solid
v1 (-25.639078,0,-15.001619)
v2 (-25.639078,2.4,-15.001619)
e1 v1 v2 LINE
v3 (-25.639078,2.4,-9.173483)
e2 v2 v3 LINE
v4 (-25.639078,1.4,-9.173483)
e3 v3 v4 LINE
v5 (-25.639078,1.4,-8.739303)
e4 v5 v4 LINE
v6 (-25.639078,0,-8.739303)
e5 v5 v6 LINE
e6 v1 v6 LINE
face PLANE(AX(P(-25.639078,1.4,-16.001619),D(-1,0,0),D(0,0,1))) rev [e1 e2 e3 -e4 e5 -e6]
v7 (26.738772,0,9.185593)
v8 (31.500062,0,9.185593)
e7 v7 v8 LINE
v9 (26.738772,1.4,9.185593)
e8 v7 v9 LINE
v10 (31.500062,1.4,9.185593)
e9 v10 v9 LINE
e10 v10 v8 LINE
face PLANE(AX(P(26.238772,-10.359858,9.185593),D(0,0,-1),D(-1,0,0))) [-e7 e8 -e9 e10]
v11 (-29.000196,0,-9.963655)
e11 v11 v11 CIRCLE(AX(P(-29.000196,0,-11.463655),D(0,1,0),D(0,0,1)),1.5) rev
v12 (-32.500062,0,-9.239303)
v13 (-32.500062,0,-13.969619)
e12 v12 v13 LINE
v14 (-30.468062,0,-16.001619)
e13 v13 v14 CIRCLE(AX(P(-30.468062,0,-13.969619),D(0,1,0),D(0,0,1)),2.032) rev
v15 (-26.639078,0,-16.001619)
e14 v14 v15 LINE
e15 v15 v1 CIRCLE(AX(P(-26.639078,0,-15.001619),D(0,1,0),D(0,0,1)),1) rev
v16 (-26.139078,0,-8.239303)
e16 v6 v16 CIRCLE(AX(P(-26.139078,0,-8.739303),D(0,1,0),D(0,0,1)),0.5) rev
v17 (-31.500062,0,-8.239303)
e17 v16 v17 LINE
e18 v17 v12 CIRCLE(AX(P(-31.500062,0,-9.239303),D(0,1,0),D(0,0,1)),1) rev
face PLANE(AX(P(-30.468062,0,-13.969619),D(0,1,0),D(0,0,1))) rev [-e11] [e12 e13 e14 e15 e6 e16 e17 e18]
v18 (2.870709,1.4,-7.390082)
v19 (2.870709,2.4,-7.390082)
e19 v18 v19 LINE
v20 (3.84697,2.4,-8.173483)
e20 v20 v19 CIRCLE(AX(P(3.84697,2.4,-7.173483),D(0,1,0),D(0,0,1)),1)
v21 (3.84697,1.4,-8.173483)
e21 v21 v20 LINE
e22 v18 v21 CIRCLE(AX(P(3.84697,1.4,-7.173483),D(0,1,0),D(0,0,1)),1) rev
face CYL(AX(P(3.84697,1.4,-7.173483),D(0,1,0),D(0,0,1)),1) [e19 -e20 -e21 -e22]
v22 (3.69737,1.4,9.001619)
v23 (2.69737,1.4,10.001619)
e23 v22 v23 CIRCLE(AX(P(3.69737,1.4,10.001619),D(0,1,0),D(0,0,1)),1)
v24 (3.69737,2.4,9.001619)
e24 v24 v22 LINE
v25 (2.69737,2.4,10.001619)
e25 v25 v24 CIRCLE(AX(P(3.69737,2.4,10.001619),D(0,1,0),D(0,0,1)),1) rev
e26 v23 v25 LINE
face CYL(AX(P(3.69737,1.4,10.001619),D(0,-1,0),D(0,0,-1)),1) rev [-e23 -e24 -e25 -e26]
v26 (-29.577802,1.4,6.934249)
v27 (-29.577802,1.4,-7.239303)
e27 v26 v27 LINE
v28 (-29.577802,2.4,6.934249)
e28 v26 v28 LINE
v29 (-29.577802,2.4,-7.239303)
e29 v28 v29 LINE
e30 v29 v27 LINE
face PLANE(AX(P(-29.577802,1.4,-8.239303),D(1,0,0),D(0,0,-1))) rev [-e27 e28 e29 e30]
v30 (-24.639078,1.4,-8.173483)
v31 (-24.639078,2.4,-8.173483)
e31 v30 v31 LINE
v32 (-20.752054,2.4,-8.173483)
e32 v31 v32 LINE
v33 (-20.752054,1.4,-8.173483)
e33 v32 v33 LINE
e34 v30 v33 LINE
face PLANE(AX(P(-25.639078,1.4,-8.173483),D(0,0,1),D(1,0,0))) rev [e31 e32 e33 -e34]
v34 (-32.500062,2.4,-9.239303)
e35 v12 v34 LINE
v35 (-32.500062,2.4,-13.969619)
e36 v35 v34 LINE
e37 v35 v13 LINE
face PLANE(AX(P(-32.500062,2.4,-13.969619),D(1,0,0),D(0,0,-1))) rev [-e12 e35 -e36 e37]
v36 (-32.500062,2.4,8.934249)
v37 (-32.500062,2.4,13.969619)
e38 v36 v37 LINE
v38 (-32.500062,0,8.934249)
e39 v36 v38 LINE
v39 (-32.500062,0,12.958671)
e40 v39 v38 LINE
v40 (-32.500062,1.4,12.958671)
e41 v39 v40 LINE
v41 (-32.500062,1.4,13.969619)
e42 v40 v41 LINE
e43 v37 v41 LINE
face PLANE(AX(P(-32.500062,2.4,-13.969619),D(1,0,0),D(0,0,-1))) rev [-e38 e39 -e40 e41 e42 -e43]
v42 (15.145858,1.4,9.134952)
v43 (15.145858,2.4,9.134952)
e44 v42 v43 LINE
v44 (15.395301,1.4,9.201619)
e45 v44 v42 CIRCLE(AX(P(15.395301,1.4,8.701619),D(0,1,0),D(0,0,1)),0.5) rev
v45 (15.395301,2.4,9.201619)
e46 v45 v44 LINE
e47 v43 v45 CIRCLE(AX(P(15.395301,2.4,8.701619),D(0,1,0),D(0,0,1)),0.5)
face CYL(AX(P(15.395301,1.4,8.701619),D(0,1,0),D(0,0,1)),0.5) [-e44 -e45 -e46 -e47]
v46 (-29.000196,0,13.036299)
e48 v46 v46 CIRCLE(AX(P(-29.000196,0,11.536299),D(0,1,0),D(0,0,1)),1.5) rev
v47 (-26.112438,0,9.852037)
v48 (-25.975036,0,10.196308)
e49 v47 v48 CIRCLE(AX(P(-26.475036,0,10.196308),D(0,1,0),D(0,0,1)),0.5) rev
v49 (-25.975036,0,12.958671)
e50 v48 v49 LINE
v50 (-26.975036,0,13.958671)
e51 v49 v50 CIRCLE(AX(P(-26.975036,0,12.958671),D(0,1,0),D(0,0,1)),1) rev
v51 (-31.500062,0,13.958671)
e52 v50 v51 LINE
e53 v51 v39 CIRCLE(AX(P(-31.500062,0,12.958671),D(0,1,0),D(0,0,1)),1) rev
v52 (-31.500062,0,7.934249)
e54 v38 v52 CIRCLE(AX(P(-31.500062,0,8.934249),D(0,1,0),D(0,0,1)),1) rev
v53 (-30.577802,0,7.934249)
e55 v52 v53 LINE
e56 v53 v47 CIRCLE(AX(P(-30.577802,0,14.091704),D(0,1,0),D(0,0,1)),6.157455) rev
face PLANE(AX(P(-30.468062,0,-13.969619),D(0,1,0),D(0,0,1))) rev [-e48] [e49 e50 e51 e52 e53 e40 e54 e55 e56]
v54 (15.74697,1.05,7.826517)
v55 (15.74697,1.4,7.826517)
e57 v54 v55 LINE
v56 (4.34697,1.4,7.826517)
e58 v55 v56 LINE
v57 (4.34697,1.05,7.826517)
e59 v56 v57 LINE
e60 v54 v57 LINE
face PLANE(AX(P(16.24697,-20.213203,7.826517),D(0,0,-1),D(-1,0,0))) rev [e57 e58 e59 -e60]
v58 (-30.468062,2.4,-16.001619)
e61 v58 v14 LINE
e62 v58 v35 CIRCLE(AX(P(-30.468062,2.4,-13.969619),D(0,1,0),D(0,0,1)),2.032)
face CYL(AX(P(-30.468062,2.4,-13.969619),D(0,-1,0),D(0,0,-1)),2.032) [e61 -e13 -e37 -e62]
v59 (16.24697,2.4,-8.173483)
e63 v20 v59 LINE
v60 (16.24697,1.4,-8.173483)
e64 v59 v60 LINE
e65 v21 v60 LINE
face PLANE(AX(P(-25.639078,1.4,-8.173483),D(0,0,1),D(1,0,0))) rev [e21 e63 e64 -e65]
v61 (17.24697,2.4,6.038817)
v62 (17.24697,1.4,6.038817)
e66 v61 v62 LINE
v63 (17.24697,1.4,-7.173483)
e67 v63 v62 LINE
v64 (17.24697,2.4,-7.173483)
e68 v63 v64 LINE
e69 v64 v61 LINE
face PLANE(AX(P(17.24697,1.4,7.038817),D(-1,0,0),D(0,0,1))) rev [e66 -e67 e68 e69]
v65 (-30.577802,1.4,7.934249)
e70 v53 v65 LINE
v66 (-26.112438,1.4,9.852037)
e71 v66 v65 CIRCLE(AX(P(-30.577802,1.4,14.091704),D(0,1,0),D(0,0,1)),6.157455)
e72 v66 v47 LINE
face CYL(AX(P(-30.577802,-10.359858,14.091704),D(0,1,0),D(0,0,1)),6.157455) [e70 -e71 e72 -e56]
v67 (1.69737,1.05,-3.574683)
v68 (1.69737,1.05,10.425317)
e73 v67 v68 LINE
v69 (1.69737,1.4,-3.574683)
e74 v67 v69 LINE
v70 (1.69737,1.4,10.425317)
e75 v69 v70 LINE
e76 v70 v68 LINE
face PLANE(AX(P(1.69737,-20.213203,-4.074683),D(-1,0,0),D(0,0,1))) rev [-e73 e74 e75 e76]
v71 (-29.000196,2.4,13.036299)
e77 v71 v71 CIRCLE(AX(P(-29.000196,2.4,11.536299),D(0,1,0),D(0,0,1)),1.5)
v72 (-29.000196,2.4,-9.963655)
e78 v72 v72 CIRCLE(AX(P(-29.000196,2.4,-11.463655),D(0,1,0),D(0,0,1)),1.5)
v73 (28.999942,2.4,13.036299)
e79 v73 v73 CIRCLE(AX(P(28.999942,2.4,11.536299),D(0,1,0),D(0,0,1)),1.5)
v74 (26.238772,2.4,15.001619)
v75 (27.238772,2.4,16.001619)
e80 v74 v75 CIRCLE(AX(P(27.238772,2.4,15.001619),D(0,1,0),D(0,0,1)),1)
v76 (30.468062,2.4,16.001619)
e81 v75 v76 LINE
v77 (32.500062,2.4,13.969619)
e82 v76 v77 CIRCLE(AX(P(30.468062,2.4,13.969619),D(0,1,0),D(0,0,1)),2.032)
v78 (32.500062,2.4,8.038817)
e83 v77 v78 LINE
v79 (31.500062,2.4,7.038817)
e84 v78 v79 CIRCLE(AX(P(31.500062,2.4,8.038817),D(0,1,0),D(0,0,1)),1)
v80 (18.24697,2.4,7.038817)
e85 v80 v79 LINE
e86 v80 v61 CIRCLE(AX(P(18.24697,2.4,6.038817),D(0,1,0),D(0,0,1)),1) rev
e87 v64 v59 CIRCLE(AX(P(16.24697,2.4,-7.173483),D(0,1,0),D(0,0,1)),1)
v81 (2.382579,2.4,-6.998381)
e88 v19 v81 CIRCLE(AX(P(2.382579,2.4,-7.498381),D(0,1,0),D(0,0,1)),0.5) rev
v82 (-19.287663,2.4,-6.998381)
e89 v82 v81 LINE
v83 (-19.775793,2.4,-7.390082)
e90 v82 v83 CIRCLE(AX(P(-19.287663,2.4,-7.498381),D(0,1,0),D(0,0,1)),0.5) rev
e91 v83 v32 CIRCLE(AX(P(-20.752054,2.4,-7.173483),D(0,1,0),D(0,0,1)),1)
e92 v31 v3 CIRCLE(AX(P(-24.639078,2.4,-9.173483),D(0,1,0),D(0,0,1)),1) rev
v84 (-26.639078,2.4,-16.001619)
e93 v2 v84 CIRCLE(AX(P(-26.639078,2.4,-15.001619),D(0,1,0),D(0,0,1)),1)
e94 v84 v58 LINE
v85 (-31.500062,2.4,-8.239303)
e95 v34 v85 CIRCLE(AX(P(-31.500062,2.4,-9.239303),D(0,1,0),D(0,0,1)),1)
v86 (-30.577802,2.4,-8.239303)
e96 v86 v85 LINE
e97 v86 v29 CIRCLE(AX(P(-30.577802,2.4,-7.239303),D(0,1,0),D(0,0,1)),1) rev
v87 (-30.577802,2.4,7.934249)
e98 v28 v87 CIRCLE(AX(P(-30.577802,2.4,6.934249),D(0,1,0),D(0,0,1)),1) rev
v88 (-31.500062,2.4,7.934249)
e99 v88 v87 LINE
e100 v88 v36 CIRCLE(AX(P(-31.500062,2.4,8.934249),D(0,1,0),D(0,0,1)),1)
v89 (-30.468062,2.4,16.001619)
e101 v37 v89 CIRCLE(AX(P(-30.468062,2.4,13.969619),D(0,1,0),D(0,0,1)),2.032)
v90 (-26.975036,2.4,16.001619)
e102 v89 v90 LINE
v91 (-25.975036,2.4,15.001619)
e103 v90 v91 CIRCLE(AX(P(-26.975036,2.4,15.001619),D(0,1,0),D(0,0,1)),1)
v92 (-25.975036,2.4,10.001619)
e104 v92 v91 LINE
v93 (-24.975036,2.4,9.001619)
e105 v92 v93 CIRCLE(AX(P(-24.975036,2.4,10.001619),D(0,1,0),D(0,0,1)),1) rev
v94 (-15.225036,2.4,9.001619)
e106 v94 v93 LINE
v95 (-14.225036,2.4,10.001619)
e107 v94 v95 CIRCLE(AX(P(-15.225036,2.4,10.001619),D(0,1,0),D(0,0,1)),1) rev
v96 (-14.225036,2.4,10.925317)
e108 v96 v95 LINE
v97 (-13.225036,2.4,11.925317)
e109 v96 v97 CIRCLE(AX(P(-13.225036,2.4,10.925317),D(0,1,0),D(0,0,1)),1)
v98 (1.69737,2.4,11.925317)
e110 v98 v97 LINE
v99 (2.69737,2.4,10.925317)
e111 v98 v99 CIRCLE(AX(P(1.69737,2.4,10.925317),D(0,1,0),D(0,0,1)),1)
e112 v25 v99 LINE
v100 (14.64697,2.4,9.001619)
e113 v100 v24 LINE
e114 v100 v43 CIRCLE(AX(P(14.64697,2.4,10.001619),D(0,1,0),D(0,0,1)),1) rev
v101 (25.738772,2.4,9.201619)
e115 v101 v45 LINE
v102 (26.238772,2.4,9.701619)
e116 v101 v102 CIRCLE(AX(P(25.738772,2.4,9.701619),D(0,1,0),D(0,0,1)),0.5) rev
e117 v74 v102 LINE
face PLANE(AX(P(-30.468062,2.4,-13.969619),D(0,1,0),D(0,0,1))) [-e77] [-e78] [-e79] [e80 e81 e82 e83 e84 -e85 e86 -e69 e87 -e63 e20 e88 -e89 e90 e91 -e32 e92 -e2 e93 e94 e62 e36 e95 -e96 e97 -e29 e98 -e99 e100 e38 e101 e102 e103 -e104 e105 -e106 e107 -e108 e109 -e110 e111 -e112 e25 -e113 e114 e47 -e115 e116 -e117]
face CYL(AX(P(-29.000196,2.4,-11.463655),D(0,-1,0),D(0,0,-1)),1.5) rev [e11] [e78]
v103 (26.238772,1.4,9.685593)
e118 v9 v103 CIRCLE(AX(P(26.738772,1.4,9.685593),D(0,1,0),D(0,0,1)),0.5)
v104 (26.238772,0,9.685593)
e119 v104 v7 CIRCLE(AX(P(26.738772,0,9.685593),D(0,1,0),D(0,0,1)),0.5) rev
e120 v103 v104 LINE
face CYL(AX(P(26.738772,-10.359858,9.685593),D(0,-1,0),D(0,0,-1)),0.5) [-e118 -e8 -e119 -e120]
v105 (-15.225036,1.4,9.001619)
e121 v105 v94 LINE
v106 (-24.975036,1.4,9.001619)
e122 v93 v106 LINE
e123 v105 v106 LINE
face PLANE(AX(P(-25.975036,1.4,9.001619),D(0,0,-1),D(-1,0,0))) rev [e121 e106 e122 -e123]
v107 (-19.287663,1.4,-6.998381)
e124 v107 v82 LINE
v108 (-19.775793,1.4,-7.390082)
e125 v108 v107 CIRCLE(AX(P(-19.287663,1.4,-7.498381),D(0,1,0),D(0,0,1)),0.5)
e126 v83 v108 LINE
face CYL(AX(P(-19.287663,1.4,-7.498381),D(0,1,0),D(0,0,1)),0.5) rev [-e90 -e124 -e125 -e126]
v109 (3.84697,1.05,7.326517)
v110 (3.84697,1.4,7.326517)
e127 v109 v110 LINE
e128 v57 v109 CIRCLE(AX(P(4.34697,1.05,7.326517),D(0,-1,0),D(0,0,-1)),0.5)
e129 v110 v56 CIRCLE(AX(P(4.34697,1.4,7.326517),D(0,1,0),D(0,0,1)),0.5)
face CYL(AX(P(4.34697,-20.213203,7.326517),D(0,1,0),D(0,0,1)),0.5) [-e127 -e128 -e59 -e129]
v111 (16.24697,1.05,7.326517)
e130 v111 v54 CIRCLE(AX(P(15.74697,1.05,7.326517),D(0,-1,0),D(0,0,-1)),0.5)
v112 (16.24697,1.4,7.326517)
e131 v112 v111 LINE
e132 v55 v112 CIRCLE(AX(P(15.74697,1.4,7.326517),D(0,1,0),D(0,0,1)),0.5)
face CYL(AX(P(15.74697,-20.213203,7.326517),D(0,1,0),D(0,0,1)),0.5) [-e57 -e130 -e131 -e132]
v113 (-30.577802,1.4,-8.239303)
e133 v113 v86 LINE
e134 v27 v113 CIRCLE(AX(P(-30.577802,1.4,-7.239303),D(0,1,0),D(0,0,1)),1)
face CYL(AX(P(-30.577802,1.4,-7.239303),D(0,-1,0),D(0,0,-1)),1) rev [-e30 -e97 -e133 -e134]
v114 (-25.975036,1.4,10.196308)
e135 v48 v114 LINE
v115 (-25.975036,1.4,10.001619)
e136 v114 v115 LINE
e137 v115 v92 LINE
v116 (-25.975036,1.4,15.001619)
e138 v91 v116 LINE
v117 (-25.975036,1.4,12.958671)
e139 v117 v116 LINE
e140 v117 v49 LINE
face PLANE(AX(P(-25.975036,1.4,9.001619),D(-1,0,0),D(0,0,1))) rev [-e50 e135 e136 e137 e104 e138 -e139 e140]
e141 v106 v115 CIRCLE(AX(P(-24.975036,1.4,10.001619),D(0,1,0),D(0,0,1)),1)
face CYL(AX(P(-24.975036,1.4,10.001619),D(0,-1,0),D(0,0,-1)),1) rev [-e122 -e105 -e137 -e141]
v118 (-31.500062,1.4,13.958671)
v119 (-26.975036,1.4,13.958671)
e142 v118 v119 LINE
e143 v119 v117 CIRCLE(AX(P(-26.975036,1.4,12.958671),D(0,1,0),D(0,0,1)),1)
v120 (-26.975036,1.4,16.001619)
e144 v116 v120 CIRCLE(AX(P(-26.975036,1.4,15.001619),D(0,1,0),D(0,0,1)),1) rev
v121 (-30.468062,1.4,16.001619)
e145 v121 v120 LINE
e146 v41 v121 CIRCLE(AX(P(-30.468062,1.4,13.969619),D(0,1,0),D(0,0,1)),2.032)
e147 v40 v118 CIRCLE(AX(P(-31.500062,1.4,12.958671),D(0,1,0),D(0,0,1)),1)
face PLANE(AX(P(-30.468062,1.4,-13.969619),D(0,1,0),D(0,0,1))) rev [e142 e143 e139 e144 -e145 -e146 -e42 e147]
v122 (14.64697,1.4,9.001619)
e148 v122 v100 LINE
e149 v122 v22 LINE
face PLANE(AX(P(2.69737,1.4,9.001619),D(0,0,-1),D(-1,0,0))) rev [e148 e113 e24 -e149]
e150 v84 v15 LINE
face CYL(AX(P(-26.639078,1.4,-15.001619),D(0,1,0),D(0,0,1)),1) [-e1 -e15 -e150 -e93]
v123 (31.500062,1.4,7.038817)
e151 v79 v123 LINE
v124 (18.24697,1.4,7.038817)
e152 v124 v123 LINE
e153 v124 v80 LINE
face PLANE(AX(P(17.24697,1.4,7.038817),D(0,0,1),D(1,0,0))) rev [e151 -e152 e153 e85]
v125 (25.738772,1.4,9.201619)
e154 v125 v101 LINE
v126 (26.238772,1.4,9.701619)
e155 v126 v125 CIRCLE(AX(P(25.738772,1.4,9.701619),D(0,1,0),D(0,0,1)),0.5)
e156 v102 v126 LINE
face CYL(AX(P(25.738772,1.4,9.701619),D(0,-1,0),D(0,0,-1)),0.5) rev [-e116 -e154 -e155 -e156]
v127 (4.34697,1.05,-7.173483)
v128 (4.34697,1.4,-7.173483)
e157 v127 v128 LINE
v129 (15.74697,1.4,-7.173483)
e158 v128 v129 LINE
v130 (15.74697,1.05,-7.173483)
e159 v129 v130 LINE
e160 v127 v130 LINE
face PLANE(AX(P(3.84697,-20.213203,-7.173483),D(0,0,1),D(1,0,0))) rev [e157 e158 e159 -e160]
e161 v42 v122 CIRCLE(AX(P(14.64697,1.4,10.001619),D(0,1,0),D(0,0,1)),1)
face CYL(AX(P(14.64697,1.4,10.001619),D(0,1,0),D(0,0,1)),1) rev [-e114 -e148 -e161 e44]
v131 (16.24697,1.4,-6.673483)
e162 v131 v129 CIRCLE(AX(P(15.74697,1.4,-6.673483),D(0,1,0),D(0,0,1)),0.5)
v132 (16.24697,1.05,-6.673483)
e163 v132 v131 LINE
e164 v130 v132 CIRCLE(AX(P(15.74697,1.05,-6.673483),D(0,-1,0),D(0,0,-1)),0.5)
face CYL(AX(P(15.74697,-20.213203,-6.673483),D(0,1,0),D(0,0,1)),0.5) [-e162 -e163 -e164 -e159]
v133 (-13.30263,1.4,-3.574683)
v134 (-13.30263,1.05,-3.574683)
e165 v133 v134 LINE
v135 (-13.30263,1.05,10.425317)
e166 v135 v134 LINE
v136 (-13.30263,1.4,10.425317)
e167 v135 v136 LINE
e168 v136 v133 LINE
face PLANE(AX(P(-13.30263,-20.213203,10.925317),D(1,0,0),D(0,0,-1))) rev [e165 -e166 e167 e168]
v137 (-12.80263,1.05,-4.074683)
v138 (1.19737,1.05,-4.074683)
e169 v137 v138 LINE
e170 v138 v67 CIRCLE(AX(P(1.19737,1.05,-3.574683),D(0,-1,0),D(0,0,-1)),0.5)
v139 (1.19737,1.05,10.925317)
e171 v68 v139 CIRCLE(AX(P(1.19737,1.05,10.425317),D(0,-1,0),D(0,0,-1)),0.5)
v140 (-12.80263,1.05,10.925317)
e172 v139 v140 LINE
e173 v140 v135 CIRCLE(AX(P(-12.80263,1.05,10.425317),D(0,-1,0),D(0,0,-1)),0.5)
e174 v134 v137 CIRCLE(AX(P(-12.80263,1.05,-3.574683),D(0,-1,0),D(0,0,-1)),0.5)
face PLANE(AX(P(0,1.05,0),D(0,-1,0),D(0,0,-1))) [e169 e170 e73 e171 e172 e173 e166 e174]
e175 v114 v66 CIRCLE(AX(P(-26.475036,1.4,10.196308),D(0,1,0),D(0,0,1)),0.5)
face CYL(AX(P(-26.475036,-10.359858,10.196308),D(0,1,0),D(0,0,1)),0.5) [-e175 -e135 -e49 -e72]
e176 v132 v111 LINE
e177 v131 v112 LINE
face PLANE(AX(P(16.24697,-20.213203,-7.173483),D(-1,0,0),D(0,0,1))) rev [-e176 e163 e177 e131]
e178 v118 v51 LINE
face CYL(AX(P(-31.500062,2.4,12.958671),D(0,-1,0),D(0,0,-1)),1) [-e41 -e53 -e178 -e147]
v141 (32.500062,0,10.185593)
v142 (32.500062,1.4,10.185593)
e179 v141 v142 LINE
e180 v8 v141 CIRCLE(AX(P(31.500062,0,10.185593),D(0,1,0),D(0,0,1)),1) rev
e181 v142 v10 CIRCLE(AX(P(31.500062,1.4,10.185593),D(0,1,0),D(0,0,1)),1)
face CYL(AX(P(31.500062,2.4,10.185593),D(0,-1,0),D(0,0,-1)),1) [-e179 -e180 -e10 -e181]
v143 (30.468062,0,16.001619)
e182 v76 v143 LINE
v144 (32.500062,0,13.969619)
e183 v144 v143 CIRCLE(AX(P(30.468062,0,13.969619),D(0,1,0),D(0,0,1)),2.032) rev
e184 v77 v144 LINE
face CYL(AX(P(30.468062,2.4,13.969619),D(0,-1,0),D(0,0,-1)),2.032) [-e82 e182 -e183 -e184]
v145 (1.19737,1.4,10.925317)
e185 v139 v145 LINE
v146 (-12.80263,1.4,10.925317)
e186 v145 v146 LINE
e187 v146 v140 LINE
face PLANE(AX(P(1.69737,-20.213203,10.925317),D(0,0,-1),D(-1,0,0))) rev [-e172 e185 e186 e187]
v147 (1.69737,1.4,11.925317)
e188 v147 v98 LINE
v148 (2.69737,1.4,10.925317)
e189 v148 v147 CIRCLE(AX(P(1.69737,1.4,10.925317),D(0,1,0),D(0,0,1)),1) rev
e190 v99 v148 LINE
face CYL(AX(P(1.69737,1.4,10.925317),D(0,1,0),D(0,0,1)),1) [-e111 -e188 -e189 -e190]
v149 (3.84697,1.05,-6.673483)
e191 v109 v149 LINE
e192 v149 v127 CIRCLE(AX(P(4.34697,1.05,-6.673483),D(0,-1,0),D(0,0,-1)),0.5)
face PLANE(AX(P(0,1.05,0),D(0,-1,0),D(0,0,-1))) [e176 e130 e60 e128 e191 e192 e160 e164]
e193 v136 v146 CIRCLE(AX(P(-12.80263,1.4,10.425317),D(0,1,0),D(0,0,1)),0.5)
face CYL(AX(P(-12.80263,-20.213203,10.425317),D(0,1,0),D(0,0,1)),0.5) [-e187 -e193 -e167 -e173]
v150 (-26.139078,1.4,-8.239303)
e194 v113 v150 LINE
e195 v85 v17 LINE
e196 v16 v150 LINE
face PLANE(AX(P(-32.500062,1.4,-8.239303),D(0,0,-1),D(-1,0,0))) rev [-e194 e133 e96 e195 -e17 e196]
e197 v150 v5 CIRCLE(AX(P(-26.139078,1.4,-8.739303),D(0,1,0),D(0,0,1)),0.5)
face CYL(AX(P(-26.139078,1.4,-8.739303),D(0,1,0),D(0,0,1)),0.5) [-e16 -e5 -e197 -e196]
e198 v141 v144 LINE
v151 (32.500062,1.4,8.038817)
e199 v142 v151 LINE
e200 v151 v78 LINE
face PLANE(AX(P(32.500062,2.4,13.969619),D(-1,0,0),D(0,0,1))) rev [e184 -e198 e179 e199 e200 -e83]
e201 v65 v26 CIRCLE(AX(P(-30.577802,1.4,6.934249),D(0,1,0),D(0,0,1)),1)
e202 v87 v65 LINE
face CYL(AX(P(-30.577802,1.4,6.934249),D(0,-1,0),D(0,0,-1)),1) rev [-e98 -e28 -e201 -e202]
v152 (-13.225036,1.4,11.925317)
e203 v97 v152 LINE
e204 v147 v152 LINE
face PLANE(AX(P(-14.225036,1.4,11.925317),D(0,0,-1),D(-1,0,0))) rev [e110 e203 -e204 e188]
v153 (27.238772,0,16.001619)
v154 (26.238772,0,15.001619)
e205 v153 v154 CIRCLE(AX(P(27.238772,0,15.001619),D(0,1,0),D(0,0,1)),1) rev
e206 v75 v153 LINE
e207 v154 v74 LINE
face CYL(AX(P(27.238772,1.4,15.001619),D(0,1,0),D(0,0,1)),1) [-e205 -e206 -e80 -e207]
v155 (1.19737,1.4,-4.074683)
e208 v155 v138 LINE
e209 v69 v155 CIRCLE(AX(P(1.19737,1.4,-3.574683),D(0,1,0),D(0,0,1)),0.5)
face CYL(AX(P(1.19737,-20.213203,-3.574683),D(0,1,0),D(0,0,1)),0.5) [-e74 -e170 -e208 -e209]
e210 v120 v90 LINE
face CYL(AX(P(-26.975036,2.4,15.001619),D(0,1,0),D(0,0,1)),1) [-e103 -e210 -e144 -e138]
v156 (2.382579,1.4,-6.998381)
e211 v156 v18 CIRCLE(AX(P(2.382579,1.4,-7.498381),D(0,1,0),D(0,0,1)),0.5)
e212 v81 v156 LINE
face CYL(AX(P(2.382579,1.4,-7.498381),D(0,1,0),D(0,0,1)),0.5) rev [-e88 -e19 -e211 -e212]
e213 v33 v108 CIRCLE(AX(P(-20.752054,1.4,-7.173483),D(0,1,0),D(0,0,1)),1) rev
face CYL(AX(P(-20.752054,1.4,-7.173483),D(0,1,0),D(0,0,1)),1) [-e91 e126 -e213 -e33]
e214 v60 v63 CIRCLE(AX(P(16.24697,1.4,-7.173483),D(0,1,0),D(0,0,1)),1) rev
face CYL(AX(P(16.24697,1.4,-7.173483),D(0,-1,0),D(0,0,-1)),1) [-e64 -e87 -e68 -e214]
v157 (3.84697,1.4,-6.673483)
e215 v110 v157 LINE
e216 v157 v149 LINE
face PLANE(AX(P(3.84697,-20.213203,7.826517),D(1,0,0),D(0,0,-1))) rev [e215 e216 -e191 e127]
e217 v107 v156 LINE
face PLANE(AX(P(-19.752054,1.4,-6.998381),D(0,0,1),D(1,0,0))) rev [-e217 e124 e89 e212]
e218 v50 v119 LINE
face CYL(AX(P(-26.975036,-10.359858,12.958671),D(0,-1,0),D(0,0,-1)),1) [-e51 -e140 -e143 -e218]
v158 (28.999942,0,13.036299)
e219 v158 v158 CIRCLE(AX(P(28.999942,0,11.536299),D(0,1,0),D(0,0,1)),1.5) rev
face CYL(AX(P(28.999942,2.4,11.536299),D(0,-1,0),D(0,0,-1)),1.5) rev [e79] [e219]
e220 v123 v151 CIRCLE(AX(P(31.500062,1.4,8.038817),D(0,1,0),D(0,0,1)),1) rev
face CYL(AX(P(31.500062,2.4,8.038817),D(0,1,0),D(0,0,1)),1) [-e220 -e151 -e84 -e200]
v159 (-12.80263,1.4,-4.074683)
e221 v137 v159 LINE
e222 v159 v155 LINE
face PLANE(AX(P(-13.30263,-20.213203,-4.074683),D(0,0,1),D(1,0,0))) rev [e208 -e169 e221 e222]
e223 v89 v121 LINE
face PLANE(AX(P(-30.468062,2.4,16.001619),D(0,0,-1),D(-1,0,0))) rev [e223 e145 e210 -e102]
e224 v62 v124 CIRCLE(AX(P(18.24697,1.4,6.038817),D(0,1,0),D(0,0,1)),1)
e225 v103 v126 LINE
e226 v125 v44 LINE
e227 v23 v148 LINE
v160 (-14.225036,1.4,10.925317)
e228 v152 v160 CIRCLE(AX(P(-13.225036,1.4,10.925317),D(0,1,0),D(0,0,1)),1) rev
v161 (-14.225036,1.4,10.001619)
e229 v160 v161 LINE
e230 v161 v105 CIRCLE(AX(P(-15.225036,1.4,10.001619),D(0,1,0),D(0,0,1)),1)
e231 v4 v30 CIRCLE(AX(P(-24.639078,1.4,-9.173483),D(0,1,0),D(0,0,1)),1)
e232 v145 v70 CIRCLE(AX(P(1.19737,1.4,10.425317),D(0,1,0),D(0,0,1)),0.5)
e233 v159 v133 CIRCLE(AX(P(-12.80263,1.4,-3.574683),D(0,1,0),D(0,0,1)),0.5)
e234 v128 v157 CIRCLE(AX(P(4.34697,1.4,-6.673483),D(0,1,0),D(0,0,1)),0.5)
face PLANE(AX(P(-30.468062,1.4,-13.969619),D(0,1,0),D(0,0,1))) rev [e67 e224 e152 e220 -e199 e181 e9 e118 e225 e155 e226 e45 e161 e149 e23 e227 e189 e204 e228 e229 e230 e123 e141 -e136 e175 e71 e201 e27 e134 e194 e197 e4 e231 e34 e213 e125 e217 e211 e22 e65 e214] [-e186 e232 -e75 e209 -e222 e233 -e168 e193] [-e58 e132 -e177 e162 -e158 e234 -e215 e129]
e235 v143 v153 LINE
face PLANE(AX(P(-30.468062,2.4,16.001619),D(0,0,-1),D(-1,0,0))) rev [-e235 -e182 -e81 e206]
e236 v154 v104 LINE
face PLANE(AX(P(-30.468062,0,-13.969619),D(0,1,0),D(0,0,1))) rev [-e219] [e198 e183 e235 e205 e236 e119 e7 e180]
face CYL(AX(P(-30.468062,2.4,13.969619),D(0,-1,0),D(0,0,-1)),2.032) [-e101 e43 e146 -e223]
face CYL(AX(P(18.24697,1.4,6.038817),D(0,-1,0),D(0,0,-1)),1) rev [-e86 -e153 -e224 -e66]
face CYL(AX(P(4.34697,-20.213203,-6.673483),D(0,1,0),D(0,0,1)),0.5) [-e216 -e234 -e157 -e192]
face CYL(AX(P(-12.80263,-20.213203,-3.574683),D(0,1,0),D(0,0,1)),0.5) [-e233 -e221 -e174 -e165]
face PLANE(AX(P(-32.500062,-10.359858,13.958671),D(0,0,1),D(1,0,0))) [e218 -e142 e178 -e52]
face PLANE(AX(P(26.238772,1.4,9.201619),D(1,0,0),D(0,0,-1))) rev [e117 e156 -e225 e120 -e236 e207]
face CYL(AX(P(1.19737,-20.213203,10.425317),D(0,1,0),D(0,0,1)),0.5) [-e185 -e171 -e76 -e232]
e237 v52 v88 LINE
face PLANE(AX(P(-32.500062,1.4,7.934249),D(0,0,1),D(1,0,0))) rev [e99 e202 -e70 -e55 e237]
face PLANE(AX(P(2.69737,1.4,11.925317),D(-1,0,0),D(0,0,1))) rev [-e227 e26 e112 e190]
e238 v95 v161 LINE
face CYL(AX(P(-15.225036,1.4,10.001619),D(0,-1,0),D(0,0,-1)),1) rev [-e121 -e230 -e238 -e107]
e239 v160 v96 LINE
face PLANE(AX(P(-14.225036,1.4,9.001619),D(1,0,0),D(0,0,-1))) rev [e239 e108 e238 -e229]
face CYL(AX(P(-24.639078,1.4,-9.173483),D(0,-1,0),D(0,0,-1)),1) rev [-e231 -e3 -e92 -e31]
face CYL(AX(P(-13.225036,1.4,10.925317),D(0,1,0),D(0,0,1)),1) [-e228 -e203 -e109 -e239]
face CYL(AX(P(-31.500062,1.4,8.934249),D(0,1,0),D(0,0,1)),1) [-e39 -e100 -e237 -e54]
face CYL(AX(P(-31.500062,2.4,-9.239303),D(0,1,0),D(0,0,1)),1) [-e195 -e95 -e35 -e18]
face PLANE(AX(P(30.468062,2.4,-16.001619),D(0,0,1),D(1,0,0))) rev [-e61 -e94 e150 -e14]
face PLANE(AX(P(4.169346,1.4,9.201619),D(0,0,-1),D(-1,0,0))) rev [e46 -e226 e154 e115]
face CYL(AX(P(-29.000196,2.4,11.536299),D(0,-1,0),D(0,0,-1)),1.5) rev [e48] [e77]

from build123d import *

# Parameters (mm, degrees)
BOSS_EXTRUDE1_START = 1.4
SKETCH2_R           = 1.5
BOSS_EXTRUDE1_DEPTH = 1
SKETCH4_W           = 51.3
SKETCH4_H           = 7.828136
CUT_EXTRUDE1_DEPTH  = 37.239562
SKETCH5_W           = 15.253092
SKETCH5_H           = 23.040436
CUT_EXTRUDE2_DEPTH  = 37.239562
SKETCH6_W           = 22.069426
SKETCH6_H           = 6.8
SKETCH6_W_2         = 11.75
SKETCH6_H_2         = 7
CUT_EXTRUDE3_DEPTH  = 37.239562
SKETCH7_W           = 2.92226
SKETCH7_H           = 16.173552
SKETCH7_W_2         = 22.599024
SKETCH7_H_2         = 1.175102
CUT_EXTRUDE4_DEPTH  = 37.239562
FILLET8_R           = 1
FILLET10_R          = 0.5
SKETCH9_W           = 12.4
SKETCH9_H           = 15
SKETCH9_W_2         = 15
BOSS_EXTRUDE2_DEPTH = 0.35
FILLET3_R           = 0.5
BOSS_EXTRUDE3_START = -2.4
SKETCH10_R          = 1.5
BOSS_EXTRUDE3_DEPTH = 2.4
FILLET6_R           = 0.5
FILLET11_R          = 1
FILLET13_R          = 0.5


with BuildPart() as part:
    # Sketch2 → Boss-Extrude1 (new body)
    with BuildSketch(Plane(origin=(0, 0, 0), x_dir=(1, 0, 0), z_dir=(0, 1, 0)).offset(BOSS_EXTRUDE1_START)):
        with BuildLine():
            Line((-32.500062, 13.969619), (-32.500062, -13.969619))
            ThreePointArc((-32.500062, -13.969619), (-31.904903, -15.40646), (-30.468062, -16.001619))
            Line((-30.468062, -16.001619), (30.468062, -16.001619))
            ThreePointArc((30.468062, -16.001619), (31.904903, -15.40646), (32.500062, -13.969619))
            Line((32.500062, -13.969619), (32.500062, 13.969619))
            ThreePointArc((32.500062, 13.969619), (31.904903, 15.40646), (30.468062, 16.001619))
            Line((30.468062, 16.001619), (-30.468062, 16.001619))
            ThreePointArc((-30.468062, 16.001619), (-31.904903, 15.40646), (-32.500062, 13.969619))
        make_face()
        with Locations(Location((28.999942, 11.463655, 0), (0, 0, 270))):
            Circle(SKETCH2_R, mode=Mode.SUBTRACT)
        with Locations(Location((28.999942, -11.536299, 0), (0, 0, 270))):
            Circle(SKETCH2_R, mode=Mode.SUBTRACT)
        with Locations(Location((-29.000196, -11.536299, 0), (0, 0, 270))):
            Circle(SKETCH2_R, mode=Mode.SUBTRACT)
        with Locations(Location((-29.000196, 11.463655, 0), (0, 0, 270))):
            Circle(SKETCH2_R, mode=Mode.SUBTRACT)
    extrude(amount=BOSS_EXTRUDE1_DEPTH)

    # Sketch4 → Cut-Extrude1 (cut, through all)
    with BuildSketch(Plane(origin=(0, 2.4, 0), x_dir=(1, 0, 0), z_dir=(0, 1, 0))):
        with Locations((0.010922, 12.087551)):
            Rectangle(SKETCH4_W, SKETCH4_H)
    extrude(amount=-CUT_EXTRUDE1_DEPTH, mode=Mode.SUBTRACT)

    # Sketch5 → Cut-Extrude2 (cut, through all)
    with BuildSketch(Plane(origin=(0, 2.4, 0), x_dir=(1, 0, 0), z_dir=(0, 1, 0))):
        with Locations((24.873516, 4.481401)):
            Rectangle(SKETCH5_W, SKETCH5_H)
    extrude(amount=-CUT_EXTRUDE2_DEPTH, mode=Mode.SUBTRACT)

    # Sketch6 → Cut-Extrude3 (cut, through all)
    with BuildSketch(Plane(origin=(0, 2.4, 0), x_dir=(1, 0, 0), z_dir=(0, 1, 0))):
        with Locations((15.204059, -12.601619)):
            Rectangle(SKETCH6_W, SKETCH6_H)
        with Locations((-20.100036, -12.501619)):
            Rectangle(SKETCH6_W_2, SKETCH6_H_2)
    extrude(amount=-CUT_EXTRUDE3_DEPTH, mode=Mode.SUBTRACT)

    # Sketch7 → Cut-Extrude4 (cut, through all)
    with BuildSketch(Plane(origin=(0, 2.4, 0), x_dir=(1, 0, 0), z_dir=(0, 1, 0))):
        Polygon((2.69737, -11.925317), (2.69737, -9.001619), (15.24697, -9.001619), (15.24697, -16.001619), (-14.225036, -16.001619), (-14.225036, -11.925317), align=None)
        with Locations((-31.038932, 0.152527)):
            Rectangle(SKETCH7_W, SKETCH7_H)
        with Locations((-8.452542, 7.585932)):
            Rectangle(SKETCH7_W_2, SKETCH7_H_2)
    extrude(amount=-CUT_EXTRUDE4_DEPTH, mode=Mode.SUBTRACT)

    # Fillet8
    # the kernel refuses this fillet: 1 mm, written as the material it adds along each edge
    with BuildSketch(Plane(origin=(15.24697, 2.4, 9.001619), x_dir=(0, 0, 1), z_dir=(0, -1, 0))) as fillet8_piece_1:
        with BuildLine():
            CenterArc((1, 0.6), FILLET8_R, 180, 36.869898)
            Line((0, 0.6), (0, 0))
            Line((0, 0), (0.2, 0))
        make_face()
    extrude(amount=1)
    with BuildSketch(Plane(origin=(-29.577802, 2.4, 7.934249), x_dir=(-1, 0, 0), z_dir=(0, -1, 0)), Plane(origin=(-25.975036, 2.4, 9.001619), x_dir=(1, 0, 0), z_dir=(0, -1, 0)), Plane(origin=(-14.225036, 2.4, 9.001619), x_dir=(0, 0, 1), z_dir=(0, -1, 0)), Plane(origin=(2.69737, 2.4, 9.001619), x_dir=(1, 0, 0), z_dir=(0, -1, 0)), Plane(origin=(17.24697, 2.4, 7.038817), x_dir=(0, 0, -1), z_dir=(0, -1, 0)), Plane(origin=(-25.639078, 2.4, -8.173483), x_dir=(0, 0, -1), z_dir=(0, -1, 0)), Plane(origin=(-29.577802, 2.4, -8.239303), x_dir=(0, 0, 1), z_dir=(0, -1, 0))) as fillet8_piece_2:
        with BuildLine():
            CenterArc((FILLET8_R, FILLET8_R), FILLET8_R, 180, 90)
            Line((0, FILLET8_R), (0, 0))
            Line((0, 0), (FILLET8_R, 0))
        make_face()
    extrude(amount=1)
    # the kernel refuses this fillet: 1 mm, written as the material it takes off along each edge
    with BuildSketch(Plane(origin=(-32.500062, 4.9, 7.934249), x_dir=(0, 0, 1), z_dir=(0, -1, 0)), Plane(origin=(-25.975036, 4.9, 16.001619), x_dir=(0, 0, -1), z_dir=(0, -1, 0)), Plane(origin=(-14.225036, 4.9, 11.925317), x_dir=(1, 0, 0), z_dir=(0, -1, 0)), Plane(origin=(2.69737, 4.9, 11.925317), x_dir=(0, 0, -1), z_dir=(0, -1, 0)), Plane(origin=(26.238772, 4.9, 16.001619), x_dir=(1, 0, 0), z_dir=(0, -1, 0)), Plane(origin=(2.84697, 4.9, -8.173483), x_dir=(0, 0, 1), z_dir=(0, -1, 0)), Plane(origin=(-19.752054, 4.9, -8.173483), x_dir=(-1, 0, 0), z_dir=(0, -1, 0)), Plane(origin=(-25.639078, 4.9, -16.001619), x_dir=(-1, 0, 0), z_dir=(0, -1, 0)), Plane(origin=(-32.500062, 4.9, -8.239303), x_dir=(1, 0, 0), z_dir=(0, -1, 0)), Plane(origin=(32.500062, 4.9, 7.038817), x_dir=(-1, 0, 0), z_dir=(0, -1, 0))) as fillet8_2_piece_1:
        with BuildLine():
            CenterArc((FILLET8_R, -FILLET8_R), FILLET8_R, 90, 90)
            Line((0, -FILLET8_R), (0, 0))
            Line((0, 0), (FILLET8_R, 0))
        make_face()
    extrude(amount=6, mode=Mode.SUBTRACT)
    with BuildSketch(Plane(origin=(17.24697, -1.1, -8.173483), x_dir=(-1, 0, 0), z_dir=(0, 1, 0))) as fillet8_2_piece_2:
        with BuildLine():
            CenterArc((FILLET8_R, FILLET8_R), FILLET8_R, 180, 90)
            Line((0, FILLET8_R), (0, 0))
            Line((0, 0), (FILLET8_R, 0))
        make_face()
    extrude(amount=6, mode=Mode.SUBTRACT)

    # Fillet10
    fillet10_edges = [part.edges().sort_by_distance(p)[0] for p in [
        (26.238772, 1.9, 9.201619),
    ]]
    fillet(fillet10_edges, radius=FILLET10_R)

    # Sketch9 → Boss-Extrude2 (add)
    with BuildSketch(Plane.XZ.offset(-1.4)):
        with Locations((10.04697, 0.326517)):
            Rectangle(SKETCH9_W, SKETCH9_H)
        with Locations((-5.80263, 3.425317)):
            Rectangle(SKETCH9_W_2, SKETCH9_H)
    extrude(amount=BOSS_EXTRUDE2_DEPTH)

    # Fillet3
    fillet3_edges = [part.edges().sort_by_distance(p)[0] for p in [
        (16.24697, 1.225, 7.826517),
        (3.84697, 1.225, 7.826517),
        (3.84697, 1.225, -7.173483),
        (16.24697, 1.225, -7.173483),
        (1.69737, 1.225, 10.925317),
        (-13.30263, 1.225, 10.925317),
        (-13.30263, 1.225, -4.074683),
        (1.69737, 1.225, -4.074683),
    ]]
    fillet(fillet3_edges, radius=FILLET3_R)

    # Sketch10 → Boss-Extrude3 (add)
    # profile 1 of 3: a face of its own
    with BuildSketch(Plane(origin=(0, 2.4, 0), x_dir=(1, 0, 0), z_dir=(0, 1, 0)).offset(BOSS_EXTRUDE3_START)):
        with BuildLine():
            Line((-30.577802, 8.239303), (-25.639078, 8.239303))
            Line((-25.639078, 8.239303), (-25.639078, 9.173483))
            Line((-25.639078, 9.173483), (-25.639078, 15.001619))
            ThreePointArc((-25.639078, 15.001619), (-25.931971, 15.708726), (-26.639078, 16.001619))
            Line((-26.639078, 16.001619), (-30.468062, 16.001619))
            ThreePointArc((-30.468062, 16.001619), (-31.904903, 15.40646), (-32.500062, 13.969619))
            Line((-32.500062, 13.969619), (-32.500062, 9.239303))
            ThreePointArc((-32.500062, 9.239303), (-32.207169, 8.532196), (-31.500062, 8.239303))
            Line((-31.500062, 8.239303), (-30.577802, 8.239303))
        make_face()
        with Locations(Location((-29.000196, 11.463655, 0), (0, 0, 270))):
            Circle(SKETCH10_R, mode=Mode.SUBTRACT)
    # profile 2 of 3: a face of its own
    with BuildSketch(Plane(origin=(0, 2.4, 0), x_dir=(1, 0, 0), z_dir=(0, 1, 0)).offset(BOSS_EXTRUDE3_START)):
        with BuildLine():
            Line((-25.975036, -10.001619), (-25.975036, -13.958671))
            Line((-25.975036, -13.958671), (-32.500062, -13.958671))
            Line((-32.500062, -13.958671), (-32.500062, -8.934249))
            ThreePointArc((-32.500062, -8.934249), (-32.207169, -8.227142), (-31.500062, -7.934249))
            Line((-31.500062, -7.934249), (-30.577802, -7.934249))
            ThreePointArc((-30.577802, -7.934249), (-28.054933, -8.47482), (-25.975036, -10.001619))
        make_face()
        with Locations(Location((-29.000196, -11.536299, 0), (0, 0, 270))):
            Circle(SKETCH10_R, mode=Mode.SUBTRACT)
    # profile 3 of 3: a face of its own
    with BuildSketch(Plane(origin=(0, 2.4, 0), x_dir=(1, 0, 0), z_dir=(0, 1, 0)).offset(BOSS_EXTRUDE3_START)):
        with BuildLine():
            Line((26.238772, -9.701619), (26.238772, -9.185593))
            Line((26.238772, -9.185593), (32.500062, -9.185593))
            Line((32.500062, -9.185593), (32.500062, -13.969619))
            ThreePointArc((32.500062, -13.969619), (31.904903, -15.40646), (30.468062, -16.001619))
            Line((30.468062, -16.001619), (27.238772, -16.001619))
            ThreePointArc((27.238772, -16.001619), (26.531665, -15.708726), (26.238772, -15.001619))
            Line((26.238772, -15.001619), (26.238772, -9.701619))
        make_face()
        with Locations(Location((28.999942, -11.536299, 0), (0, 0, 270))):
            Circle(SKETCH10_R, mode=Mode.SUBTRACT)
    extrude(amount=BOSS_EXTRUDE3_DEPTH)

    # Fillet6
    fillet6_edges = [part.edges().sort_by_distance(p)[0] for p in [
        (15.24697, 1.9, 9.201619),
        (2.84697, 1.9, -6.998381),
        (-19.752054, 1.9, -6.998381),
        (-25.639078, 0.7, -8.239303),
    ]]
    fillet(fillet6_edges, radius=FILLET6_R)

    # Fillet11
    fillet11_edges = [part.edges().sort_by_distance(p)[0] for p in [
        (-25.975036, 0.7, 13.958671),
        (-32.500062, 0.7, 13.958671),
        (32.500062, 0.7, 9.185593),
    ]]
    fillet(fillet11_edges, radius=FILLET11_R)

    # Fillet13
    fillet13_edges = [part.edges().sort_by_distance(p)[0] for p in [
        (-25.975036, 0.7, 10.001619),
        (26.238772, 0.7, 9.185593),
    ]]
    fillet(fillet13_edges, radius=FILLET13_R)


solid = part.part
